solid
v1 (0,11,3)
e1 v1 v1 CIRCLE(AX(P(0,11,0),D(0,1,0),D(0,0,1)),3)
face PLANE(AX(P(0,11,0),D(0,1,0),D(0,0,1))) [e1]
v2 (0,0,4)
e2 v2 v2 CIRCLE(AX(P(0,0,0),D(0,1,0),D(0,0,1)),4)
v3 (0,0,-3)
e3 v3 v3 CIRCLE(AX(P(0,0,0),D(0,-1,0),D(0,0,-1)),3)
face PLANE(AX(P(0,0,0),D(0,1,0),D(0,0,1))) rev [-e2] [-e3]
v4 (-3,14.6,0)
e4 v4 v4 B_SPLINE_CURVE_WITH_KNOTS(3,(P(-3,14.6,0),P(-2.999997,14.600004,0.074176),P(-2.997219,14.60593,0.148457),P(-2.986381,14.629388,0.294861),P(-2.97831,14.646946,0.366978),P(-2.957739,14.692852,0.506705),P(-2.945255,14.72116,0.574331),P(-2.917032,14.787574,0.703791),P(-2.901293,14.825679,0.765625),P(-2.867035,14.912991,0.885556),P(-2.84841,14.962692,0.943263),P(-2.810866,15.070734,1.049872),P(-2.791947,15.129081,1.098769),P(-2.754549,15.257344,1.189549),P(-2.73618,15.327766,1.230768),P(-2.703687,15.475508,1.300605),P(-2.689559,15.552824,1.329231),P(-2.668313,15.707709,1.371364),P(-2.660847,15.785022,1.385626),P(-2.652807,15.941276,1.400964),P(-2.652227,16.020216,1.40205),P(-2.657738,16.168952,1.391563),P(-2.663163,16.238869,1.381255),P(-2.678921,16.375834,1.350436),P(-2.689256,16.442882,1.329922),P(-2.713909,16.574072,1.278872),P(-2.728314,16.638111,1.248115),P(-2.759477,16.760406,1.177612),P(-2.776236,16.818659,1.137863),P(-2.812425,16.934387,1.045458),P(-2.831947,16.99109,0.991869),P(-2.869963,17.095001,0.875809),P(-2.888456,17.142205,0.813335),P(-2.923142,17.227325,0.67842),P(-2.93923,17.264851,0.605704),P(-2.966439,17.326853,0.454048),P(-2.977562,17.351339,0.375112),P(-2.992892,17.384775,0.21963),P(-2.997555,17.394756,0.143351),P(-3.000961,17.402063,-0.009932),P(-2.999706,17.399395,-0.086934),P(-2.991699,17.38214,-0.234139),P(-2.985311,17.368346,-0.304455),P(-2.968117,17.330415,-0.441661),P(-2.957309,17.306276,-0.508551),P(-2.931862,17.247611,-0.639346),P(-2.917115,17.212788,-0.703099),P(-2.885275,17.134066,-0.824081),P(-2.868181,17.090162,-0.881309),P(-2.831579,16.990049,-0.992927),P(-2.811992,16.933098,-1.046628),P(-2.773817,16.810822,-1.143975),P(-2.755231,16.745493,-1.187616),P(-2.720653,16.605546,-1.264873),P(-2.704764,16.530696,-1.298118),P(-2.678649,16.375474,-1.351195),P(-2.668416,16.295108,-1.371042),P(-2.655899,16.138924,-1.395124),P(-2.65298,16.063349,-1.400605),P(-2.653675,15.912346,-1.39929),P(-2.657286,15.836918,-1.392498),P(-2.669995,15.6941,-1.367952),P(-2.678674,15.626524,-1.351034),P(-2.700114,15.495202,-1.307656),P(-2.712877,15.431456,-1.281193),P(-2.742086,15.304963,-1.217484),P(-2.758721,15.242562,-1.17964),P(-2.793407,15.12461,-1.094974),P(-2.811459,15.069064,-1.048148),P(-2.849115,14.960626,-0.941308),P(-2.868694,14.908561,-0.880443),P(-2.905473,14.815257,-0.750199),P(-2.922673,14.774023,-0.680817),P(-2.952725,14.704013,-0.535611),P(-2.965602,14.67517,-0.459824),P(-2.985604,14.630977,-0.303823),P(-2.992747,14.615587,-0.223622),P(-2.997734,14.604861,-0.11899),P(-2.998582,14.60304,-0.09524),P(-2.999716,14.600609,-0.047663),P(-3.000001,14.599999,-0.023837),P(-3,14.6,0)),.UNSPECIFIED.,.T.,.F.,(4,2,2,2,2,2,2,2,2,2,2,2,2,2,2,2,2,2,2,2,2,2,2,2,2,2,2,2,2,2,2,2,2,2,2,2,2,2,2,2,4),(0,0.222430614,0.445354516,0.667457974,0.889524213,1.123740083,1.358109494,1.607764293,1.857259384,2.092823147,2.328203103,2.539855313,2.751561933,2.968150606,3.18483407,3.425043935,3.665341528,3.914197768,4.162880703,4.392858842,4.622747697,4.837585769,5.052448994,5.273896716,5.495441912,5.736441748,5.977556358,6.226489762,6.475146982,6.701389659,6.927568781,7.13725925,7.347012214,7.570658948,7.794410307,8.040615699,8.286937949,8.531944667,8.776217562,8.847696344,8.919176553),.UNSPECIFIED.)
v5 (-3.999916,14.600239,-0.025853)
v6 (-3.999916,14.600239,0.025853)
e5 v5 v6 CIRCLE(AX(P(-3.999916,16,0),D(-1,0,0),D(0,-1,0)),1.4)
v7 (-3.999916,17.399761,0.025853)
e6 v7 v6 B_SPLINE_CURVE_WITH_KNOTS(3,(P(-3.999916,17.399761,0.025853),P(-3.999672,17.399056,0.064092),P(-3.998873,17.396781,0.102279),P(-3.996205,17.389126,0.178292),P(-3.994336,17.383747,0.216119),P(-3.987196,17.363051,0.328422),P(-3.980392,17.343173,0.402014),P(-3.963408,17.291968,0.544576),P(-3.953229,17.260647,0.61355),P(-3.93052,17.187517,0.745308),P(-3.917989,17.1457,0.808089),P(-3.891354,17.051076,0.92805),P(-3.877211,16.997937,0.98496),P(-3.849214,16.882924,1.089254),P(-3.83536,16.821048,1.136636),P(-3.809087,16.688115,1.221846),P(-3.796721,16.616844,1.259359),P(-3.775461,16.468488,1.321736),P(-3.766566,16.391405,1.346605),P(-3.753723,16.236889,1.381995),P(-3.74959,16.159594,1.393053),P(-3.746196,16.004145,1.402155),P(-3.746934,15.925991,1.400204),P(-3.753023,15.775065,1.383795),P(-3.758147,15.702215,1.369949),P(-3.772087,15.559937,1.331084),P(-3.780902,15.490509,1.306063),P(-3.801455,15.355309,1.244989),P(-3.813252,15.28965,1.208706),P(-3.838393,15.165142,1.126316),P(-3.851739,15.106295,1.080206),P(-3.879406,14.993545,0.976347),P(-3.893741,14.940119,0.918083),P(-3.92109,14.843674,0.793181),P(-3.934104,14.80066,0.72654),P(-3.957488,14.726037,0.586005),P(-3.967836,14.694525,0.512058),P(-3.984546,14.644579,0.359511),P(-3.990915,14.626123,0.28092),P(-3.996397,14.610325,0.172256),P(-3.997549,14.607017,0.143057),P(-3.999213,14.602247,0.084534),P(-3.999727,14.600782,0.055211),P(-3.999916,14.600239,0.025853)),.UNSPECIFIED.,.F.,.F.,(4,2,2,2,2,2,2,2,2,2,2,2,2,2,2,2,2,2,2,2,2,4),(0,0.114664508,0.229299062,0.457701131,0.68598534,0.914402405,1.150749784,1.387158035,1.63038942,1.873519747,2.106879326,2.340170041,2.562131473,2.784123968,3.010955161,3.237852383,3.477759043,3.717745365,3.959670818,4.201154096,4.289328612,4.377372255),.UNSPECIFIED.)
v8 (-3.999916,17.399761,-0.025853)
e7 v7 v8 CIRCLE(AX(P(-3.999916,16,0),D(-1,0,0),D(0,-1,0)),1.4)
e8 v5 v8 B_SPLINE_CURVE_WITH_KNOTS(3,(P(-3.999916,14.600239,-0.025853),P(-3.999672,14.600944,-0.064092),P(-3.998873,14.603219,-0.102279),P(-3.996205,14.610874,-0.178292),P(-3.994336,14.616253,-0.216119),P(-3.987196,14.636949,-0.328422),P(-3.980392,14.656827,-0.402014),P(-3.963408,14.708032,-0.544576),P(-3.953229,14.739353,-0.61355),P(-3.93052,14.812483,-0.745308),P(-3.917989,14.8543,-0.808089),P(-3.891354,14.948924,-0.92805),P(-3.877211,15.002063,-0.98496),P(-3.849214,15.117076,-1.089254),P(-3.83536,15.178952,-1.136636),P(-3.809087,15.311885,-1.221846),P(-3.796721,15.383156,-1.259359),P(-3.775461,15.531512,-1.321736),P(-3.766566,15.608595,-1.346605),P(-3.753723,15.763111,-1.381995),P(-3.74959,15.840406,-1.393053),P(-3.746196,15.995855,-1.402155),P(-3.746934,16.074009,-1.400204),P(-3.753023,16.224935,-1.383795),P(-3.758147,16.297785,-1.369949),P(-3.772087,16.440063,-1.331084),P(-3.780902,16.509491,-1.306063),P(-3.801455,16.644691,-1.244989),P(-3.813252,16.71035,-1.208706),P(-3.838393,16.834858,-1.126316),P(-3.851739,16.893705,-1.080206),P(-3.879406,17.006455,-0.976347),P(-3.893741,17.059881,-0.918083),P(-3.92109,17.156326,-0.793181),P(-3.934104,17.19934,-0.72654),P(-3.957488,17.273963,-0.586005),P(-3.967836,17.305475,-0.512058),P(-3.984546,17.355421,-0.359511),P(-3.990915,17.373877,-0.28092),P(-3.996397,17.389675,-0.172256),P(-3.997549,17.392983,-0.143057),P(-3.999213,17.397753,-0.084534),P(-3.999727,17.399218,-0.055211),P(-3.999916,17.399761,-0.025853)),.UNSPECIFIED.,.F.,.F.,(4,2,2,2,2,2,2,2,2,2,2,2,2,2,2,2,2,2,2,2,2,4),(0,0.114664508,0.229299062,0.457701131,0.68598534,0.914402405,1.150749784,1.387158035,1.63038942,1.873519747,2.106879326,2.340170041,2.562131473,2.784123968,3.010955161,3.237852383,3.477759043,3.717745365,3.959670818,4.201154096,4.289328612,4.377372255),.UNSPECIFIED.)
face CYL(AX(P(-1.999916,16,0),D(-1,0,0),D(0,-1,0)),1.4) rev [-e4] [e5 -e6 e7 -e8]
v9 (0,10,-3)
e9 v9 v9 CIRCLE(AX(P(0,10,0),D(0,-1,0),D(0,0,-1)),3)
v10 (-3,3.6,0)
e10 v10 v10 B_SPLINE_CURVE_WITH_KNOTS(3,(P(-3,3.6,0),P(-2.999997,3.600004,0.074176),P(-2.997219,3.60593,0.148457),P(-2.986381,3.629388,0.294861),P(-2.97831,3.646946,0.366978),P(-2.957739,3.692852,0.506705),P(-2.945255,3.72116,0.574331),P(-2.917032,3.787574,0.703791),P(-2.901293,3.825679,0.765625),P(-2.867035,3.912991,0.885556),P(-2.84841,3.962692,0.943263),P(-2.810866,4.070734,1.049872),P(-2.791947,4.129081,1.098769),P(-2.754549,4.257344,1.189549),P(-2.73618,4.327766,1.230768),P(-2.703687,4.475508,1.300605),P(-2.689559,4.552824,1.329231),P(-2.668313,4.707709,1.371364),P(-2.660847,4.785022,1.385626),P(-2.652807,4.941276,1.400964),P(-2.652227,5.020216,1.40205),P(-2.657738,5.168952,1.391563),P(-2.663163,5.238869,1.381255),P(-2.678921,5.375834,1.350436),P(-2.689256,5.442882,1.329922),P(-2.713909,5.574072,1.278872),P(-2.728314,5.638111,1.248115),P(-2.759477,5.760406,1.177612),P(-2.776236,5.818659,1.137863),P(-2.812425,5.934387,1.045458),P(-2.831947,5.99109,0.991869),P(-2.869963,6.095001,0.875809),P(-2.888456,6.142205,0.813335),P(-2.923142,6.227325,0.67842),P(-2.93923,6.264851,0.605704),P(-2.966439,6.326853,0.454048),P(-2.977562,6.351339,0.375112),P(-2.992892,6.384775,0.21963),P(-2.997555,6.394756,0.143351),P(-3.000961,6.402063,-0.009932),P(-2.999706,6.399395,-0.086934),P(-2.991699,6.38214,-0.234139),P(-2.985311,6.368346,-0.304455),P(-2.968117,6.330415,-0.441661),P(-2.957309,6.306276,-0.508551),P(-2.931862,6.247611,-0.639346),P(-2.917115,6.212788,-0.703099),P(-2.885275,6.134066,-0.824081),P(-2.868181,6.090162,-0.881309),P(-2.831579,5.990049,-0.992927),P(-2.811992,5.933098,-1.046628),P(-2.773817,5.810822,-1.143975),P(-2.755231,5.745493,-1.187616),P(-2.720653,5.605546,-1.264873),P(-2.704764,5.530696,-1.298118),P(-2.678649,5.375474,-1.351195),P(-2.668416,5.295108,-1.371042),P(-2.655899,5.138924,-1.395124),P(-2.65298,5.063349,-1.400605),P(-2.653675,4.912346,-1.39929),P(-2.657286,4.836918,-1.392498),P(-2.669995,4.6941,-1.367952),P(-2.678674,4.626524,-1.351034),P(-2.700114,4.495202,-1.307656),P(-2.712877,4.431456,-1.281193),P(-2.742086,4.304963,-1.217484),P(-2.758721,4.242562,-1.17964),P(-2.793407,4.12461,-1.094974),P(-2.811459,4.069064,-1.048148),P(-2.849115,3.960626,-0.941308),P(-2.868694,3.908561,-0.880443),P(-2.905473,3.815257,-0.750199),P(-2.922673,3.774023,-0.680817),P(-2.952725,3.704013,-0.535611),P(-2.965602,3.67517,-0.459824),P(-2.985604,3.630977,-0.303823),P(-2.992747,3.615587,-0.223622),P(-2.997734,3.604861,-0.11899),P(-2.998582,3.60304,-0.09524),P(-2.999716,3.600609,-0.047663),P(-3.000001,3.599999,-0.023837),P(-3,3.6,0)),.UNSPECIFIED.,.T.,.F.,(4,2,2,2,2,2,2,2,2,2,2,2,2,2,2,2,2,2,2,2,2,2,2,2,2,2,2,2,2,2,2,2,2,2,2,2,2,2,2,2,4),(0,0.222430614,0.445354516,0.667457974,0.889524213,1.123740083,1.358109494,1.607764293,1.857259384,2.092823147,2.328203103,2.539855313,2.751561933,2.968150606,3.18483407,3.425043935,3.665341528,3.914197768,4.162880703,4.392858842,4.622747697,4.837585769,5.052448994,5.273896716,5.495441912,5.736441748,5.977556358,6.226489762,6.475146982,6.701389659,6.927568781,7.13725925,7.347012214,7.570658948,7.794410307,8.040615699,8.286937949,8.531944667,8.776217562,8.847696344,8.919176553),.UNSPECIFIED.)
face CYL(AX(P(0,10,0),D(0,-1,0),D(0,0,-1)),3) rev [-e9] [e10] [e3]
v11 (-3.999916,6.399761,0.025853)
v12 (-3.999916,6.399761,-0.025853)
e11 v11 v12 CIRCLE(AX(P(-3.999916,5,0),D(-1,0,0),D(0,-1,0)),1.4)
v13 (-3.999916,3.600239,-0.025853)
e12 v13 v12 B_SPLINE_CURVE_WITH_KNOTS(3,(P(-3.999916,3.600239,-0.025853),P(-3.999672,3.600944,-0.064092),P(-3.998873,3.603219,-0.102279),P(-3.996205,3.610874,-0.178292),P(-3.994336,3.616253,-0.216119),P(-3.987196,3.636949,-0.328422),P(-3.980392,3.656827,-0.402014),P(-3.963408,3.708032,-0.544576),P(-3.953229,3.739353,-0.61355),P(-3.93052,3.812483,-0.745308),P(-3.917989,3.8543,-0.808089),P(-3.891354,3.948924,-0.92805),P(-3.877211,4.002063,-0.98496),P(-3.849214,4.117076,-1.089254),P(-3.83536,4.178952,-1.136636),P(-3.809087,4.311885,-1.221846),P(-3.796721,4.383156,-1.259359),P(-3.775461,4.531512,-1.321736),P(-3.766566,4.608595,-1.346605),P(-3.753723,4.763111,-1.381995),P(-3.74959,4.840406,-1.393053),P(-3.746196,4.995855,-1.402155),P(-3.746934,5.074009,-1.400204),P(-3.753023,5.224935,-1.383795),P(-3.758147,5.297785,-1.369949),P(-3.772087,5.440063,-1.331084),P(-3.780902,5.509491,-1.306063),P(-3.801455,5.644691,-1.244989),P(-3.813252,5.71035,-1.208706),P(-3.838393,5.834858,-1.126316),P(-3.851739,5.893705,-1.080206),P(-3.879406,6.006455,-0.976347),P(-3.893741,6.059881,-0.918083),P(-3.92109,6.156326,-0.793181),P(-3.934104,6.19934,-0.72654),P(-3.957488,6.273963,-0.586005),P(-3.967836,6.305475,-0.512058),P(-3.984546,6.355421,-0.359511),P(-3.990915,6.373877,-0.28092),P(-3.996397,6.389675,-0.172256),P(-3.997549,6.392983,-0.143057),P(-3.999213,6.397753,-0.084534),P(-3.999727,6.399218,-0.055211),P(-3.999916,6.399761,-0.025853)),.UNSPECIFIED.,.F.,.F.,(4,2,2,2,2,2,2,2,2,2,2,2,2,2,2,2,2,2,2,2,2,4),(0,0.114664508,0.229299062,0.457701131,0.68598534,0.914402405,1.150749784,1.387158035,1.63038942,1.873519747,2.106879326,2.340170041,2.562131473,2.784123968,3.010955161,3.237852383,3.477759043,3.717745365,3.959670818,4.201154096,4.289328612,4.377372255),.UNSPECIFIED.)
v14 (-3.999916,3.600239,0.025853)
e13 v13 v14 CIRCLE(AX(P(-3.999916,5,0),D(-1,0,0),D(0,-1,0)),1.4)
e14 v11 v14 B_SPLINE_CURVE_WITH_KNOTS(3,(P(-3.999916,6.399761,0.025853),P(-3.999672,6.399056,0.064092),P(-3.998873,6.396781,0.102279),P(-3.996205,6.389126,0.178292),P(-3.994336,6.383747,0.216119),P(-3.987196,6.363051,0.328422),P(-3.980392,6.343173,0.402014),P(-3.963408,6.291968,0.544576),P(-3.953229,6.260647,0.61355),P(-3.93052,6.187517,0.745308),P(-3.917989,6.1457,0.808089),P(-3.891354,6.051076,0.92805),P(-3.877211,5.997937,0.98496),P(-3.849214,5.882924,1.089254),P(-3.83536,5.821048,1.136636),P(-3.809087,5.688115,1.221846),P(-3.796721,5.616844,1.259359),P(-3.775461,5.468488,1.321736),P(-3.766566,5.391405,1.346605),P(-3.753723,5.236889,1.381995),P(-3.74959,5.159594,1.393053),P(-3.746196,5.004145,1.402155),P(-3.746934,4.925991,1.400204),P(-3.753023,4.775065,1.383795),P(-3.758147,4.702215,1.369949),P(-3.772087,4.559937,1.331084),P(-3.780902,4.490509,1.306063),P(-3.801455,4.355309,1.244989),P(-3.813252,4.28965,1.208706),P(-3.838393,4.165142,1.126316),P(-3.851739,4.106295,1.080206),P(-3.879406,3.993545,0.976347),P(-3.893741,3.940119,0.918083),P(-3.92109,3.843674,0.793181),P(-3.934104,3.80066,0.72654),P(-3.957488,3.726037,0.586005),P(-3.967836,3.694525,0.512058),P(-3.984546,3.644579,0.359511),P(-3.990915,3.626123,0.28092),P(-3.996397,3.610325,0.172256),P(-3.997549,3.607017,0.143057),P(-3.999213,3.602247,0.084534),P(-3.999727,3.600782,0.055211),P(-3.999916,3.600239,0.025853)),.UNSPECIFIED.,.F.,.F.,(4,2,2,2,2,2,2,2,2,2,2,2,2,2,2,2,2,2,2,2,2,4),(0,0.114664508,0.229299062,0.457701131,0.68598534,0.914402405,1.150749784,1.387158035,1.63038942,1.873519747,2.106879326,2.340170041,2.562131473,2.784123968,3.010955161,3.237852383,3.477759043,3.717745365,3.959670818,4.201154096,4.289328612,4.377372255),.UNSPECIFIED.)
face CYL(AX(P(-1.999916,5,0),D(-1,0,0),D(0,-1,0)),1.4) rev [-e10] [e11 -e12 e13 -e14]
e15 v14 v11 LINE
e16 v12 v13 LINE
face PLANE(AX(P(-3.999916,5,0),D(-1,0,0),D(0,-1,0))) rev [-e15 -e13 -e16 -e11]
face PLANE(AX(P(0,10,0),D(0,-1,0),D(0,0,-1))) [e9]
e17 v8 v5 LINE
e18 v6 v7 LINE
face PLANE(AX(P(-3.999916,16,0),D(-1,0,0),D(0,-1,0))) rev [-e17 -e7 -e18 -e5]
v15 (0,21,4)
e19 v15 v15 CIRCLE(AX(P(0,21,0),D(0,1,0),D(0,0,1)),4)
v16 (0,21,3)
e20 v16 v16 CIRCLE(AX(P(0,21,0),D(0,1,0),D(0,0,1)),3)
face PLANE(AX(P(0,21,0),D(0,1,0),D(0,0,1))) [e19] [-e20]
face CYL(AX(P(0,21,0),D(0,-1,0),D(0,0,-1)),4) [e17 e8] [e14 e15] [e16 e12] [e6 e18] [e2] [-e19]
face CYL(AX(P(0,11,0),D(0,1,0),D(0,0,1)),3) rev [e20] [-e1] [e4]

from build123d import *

# Parameters (mm, degrees)
SKETCH1_R           = 4
BOSS_EXTRUDE1_DEPTH = 21
SKETCH2_R           = 3
CUT_EXTRUDE1_DEPTH  = 10
CUT_EXTRUDE3_START  = -10
SKETCH3_R           = 3
CUT_EXTRUDE3_DEPTH  = 10


with BuildPart() as part:
    # Sketch1 → Boss-Extrude1 (new body)
    with BuildSketch(Plane(origin=(0, 0, 0), x_dir=(1, 0, 0), z_dir=(0, 1, 0))):
        with Locations(Location((0, 0, 0), (0, 0, 90))):
            Circle(SKETCH1_R)
    extrude(amount=BOSS_EXTRUDE1_DEPTH)

    # Sketch2 → Cut-Extrude1 (cut)
    with BuildSketch(Plane.XZ):
        with Locations(Location((0, 0, 0), (0, 0, 270))):
            Circle(SKETCH2_R)
    extrude(amount=-CUT_EXTRUDE1_DEPTH, mode=Mode.SUBTRACT)

    # Sketch3 → Cut-Extrude3 (cut)
    with BuildSketch(Plane(origin=(0, 21, 0), x_dir=(1, 0, 0), z_dir=(0, 1, 0)).offset(CUT_EXTRUDE3_START)):
        with Locations(Location((0, 0, 0), (0, 0, 90))):
            Circle(SKETCH3_R)
    extrude(amount=CUT_EXTRUDE3_DEPTH, mode=Mode.SUBTRACT)

    # Cut-Extrude5: read off the stored shape, not the designer's step
    # Cut-Extrude5: loft between two sections, ruled curve by curve
    cut_extrude5_from = [
        Edge.make_three_point_arc((-2.653136305, 14.6, 0), (-2.653136305, 16, 1.4), (-2.653136305, 17.4, 0)),
        Edge.make_three_point_arc((-2.653136305, 17.4, 0), (-2.653136305, 16, -1.4), (-2.653136305, 14.6, 0)),
    ]
    cut_extrude5_to = [
        Edge.make_three_point_arc((-3.999916451, 14.6, 0), (-3.999916451, 16, 1.4), (-3.999916451, 17.4, 0)),
        Edge.make_three_point_arc((-3.999916451, 17.4, 0), (-3.999916451, 16, -1.4), (-3.999916451, 14.6, 0)),
    ]
    cut_extrude5 = Solid(Shell([*[Face.make_surface_from_curves(cut_extrude5_from[k], cut_extrude5_to[k]) for k in range(2)], Face(Wire(cut_extrude5_from)), Face(Wire(cut_extrude5_to))]))
    add(cut_extrude5, mode=Mode.SUBTRACT)

    # Cut-Extrude5 2: loft between two sections, ruled curve by curve
    cut_extrude5_2_from = [
        Edge.make_three_point_arc((-2.653136305, 3.6, 0), (-2.653136305, 5, 1.4), (-2.653136305, 6.4, 0)),
        Edge.make_three_point_arc((-2.653136305, 6.4, 0), (-2.653136305, 5, -1.4), (-2.653136305, 3.6, 0)),
    ]
    cut_extrude5_2_to = [
        Edge.make_three_point_arc((-3.999916451, 3.6, 0), (-3.999916451, 5, 1.4), (-3.999916451, 6.4, 0)),
        Edge.make_three_point_arc((-3.999916451, 6.4, 0), (-3.999916451, 5, -1.4), (-3.999916451, 3.6, 0)),
    ]
    cut_extrude5_2 = Solid(Shell([*[Face.make_surface_from_curves(cut_extrude5_2_from[k], cut_extrude5_2_to[k]) for k in range(2)], Face(Wire(cut_extrude5_2_from)), Face(Wire(cut_extrude5_2_to))]))
    add(cut_extrude5_2, mode=Mode.SUBTRACT)


solid = part.part
